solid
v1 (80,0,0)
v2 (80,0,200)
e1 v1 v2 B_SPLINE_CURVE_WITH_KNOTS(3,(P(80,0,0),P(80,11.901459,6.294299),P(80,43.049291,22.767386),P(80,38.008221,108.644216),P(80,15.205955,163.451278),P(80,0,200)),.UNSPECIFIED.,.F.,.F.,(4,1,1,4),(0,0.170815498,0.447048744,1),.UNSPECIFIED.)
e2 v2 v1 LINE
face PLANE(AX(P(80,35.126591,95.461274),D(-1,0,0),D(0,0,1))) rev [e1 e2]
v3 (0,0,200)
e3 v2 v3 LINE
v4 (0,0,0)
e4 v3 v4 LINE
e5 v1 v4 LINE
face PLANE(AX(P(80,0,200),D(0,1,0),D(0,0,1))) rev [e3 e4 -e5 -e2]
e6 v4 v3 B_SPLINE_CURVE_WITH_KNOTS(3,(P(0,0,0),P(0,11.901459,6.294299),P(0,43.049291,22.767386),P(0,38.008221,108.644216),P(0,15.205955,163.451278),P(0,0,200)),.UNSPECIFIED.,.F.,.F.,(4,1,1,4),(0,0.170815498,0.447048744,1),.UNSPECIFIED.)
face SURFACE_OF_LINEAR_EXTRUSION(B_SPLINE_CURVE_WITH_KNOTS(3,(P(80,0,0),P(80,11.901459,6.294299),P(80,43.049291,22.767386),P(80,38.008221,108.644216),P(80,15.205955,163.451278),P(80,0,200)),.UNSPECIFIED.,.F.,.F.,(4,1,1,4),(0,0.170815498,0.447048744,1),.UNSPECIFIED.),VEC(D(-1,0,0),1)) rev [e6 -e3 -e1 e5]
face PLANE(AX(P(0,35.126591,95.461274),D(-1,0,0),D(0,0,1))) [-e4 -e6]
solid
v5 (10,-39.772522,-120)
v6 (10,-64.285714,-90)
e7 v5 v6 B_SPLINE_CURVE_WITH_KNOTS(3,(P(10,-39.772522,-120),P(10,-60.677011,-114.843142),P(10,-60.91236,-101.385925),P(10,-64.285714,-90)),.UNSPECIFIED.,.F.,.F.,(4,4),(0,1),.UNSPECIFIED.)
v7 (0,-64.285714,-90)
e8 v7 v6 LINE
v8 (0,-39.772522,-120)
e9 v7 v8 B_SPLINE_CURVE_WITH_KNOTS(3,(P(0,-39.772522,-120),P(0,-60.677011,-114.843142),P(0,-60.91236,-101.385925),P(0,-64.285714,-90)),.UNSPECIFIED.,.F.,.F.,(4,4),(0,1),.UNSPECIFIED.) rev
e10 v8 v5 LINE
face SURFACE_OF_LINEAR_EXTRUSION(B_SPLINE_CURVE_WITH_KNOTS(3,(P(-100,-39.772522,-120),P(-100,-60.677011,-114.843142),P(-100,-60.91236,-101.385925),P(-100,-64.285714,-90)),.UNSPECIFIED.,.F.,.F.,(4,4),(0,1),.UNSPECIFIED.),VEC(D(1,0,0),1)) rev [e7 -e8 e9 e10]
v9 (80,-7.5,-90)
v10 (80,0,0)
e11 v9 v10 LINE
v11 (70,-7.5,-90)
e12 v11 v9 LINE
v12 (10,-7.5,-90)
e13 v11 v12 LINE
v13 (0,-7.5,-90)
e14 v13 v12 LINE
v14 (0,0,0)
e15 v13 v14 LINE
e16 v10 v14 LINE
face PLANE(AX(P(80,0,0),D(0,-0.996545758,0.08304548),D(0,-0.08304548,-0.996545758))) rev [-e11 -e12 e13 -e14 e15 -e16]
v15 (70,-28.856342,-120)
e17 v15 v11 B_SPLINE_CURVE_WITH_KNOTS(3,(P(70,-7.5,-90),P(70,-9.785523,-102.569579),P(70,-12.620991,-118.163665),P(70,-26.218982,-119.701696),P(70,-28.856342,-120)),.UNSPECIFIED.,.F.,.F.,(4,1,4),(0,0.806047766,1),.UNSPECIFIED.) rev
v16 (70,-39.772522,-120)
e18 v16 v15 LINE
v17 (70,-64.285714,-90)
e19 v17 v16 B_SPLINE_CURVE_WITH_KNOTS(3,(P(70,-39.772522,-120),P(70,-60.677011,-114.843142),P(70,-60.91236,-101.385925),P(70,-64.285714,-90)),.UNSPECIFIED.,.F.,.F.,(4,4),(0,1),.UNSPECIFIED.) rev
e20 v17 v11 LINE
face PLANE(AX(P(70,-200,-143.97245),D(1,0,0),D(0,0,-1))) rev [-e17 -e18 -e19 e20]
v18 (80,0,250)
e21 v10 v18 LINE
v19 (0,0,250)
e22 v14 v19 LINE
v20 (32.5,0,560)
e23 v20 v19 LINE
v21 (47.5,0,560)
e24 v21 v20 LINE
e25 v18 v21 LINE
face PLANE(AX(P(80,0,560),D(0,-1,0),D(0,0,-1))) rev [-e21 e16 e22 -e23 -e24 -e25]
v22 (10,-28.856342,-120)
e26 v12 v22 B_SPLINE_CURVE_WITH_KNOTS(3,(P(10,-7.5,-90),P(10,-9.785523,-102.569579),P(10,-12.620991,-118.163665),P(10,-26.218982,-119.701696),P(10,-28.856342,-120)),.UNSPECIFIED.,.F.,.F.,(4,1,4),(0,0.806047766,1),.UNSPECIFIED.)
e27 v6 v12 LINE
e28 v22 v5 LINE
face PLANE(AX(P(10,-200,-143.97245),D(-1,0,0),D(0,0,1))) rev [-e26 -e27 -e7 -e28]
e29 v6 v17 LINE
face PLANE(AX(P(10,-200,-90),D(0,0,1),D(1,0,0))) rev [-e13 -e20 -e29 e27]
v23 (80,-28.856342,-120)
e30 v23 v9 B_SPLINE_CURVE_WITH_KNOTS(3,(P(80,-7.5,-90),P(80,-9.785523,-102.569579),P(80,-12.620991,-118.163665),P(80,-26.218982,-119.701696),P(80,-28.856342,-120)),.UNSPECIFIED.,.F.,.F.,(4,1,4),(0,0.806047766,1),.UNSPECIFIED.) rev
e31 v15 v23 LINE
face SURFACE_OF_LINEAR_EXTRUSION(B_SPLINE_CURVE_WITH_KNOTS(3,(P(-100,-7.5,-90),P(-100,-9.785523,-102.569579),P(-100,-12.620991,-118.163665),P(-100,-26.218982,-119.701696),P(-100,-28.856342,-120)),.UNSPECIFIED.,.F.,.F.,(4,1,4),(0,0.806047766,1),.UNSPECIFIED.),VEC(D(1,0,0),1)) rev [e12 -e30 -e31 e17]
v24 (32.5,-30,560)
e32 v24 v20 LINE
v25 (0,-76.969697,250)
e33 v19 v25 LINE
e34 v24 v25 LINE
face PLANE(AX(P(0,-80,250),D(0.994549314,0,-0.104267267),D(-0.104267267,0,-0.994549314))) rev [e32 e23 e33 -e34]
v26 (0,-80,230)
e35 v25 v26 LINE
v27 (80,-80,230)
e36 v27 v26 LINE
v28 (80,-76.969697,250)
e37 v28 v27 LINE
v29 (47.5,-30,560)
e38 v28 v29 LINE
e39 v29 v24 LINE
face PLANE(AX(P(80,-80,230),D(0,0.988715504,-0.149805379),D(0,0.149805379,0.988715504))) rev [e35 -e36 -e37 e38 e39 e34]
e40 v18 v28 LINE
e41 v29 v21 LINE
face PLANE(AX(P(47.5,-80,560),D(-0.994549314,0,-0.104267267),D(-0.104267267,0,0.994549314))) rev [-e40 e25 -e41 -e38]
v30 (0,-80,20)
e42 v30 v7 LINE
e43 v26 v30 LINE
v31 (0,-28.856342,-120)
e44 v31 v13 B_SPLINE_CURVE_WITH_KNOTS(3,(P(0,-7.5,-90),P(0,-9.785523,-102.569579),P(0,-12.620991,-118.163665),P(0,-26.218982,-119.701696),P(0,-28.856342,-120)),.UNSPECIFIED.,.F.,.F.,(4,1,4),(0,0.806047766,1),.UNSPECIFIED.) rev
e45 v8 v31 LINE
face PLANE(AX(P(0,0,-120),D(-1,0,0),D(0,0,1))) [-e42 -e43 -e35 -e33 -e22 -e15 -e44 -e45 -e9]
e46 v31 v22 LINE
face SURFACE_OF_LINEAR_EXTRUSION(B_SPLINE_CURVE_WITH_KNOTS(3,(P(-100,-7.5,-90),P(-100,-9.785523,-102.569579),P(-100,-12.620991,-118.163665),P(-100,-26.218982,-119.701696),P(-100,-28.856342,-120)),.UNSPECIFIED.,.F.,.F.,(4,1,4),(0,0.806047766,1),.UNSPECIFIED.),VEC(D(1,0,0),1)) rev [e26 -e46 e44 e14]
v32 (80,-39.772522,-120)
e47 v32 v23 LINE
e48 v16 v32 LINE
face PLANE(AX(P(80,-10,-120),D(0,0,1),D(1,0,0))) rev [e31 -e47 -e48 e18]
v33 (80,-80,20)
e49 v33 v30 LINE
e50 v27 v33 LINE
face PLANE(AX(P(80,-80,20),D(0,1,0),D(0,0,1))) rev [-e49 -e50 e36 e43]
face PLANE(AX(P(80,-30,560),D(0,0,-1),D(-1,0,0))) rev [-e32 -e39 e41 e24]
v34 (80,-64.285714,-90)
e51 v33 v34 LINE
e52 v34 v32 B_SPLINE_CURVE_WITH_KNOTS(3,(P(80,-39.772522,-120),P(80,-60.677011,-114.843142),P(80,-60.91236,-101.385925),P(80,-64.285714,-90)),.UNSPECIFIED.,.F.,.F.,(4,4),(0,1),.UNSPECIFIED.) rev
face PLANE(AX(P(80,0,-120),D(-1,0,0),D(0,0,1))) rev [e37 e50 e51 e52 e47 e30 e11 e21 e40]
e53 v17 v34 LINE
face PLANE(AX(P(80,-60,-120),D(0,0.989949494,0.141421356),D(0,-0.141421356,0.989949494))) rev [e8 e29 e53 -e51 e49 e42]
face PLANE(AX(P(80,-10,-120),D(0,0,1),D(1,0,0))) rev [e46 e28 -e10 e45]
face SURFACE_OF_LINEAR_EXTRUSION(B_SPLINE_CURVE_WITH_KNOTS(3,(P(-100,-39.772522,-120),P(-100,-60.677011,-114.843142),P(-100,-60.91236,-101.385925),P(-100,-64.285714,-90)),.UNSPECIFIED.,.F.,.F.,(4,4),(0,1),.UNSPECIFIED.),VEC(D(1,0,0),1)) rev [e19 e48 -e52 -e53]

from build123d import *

# Parameters (mm, degrees)
EXTRUDE_1_DEPTH     = 80
CUT_EXTRUDE_1_DEPTH = 572.314274283
CUT_EXTRUDE_3_DEPTH = 80
SKETCH_4_W          = 60
SKETCH_4_H          = 53.972449548
CUT_EXTRUDE_4_DEPTH = 200
EXTRUDE_2_DEPTH     = 80


# Read off the part's stored shape, not the designer's step: 切除-拉伸3
with BuildPart() as part:
    # 草图1 → 拉伸1 (new body)
    with BuildSketch(Plane(origin=(0, 0, 0), x_dir=(0, 0, -1), z_dir=(1, 0, 0))):
        Polygon((0, 0), (120, -10), (120, -60), (-20, -80), (-230, -80), (-560, -30), (-560, 0), align=None)
    extrude(amount=EXTRUDE_1_DEPTH)

    # 草图2 → 切除-拉伸1 (cut, through all)
    with BuildSketch(Plane(origin=(0, 0, 0), x_dir=(1, 0, 0), z_dir=(0, 1, 0))):
        Polygon((-123.214670982, -250), (0, -250), (32.5, -560), (47.5, -560), (80, -250), (223.387270766, -250), (223.387270766, -944.244796541), (-123.214670982, -944.244796541), align=None)
    extrude(amount=-CUT_EXTRUDE_1_DEPTH, mode=Mode.SUBTRACT)

    # 切除-拉伸3 outline → 切除-拉伸3 (cut)
    with BuildSketch(Plane(origin=(0, 0, 0), x_dir=(0, 0, -1), z_dir=(1, 0, 0))):
        with BuildLine():
            Line((120, -10), (90, -7.5))
            add(Edge.make_bspline(
                [(90, -7.5), (102.569578594, -9.785522719), (118.163665106, -12.620990808), (119.701695558, -26.218981675), (120, -28.856342384)],
                knots=[0, 0, 0, 0, 0.806047766, 1, 1, 1, 1], degree=3))
            Line((120, -28.856342384), (120, -10))
        make_face()
        with BuildLine():
            Line((120, -60), (120, -39.772521617))
            add(Edge.make_bspline(
                [(120, -39.772521617), (114.843141559, -60.677011253), (101.385924703, -60.912360271), (90, -64.285714286)],
                knots=[0, 0, 0, 0, 1, 1, 1, 1], degree=3))
            Line((90, -64.285714286), (120, -60))
        make_face()
    extrude(amount=CUT_EXTRUDE_3_DEPTH, mode=Mode.SUBTRACT)

    # 草图4 → 切除-拉伸4 (cut)
    with BuildSketch(Plane(origin=(0, 0, 0), x_dir=(1, 0, 0), z_dir=(0, 1, 0))):
        with Locations((40, 116.986224774)):
            Rectangle(SKETCH_4_W, SKETCH_4_H)
    extrude(amount=-CUT_EXTRUDE_4_DEPTH, mode=Mode.SUBTRACT)


with BuildPart() as body_2:
    # 草图5 → 拉伸2 (new body)
    with BuildSketch(Plane(origin=(0, 0, 0), x_dir=(0, 0, -1), z_dir=(1, 0, 0))):
        with BuildLine():
            Line((-200, 0), (0, 0))
            add(Edge.make_bspline(
                [(0, 0), (-6.294299224, 11.901459338), (-22.767386249, 43.049291436), (-108.644216453, 38.00822116), (-163.451278249, 15.205954626), (-200, 0)],
                knots=[0, 0, 0, 0, 0.170815498, 0.447048744, 1, 1, 1, 1], degree=3))
        make_face()
    extrude(amount=EXTRUDE_2_DEPTH)


solid = Compound([part.part, body_2.part])
